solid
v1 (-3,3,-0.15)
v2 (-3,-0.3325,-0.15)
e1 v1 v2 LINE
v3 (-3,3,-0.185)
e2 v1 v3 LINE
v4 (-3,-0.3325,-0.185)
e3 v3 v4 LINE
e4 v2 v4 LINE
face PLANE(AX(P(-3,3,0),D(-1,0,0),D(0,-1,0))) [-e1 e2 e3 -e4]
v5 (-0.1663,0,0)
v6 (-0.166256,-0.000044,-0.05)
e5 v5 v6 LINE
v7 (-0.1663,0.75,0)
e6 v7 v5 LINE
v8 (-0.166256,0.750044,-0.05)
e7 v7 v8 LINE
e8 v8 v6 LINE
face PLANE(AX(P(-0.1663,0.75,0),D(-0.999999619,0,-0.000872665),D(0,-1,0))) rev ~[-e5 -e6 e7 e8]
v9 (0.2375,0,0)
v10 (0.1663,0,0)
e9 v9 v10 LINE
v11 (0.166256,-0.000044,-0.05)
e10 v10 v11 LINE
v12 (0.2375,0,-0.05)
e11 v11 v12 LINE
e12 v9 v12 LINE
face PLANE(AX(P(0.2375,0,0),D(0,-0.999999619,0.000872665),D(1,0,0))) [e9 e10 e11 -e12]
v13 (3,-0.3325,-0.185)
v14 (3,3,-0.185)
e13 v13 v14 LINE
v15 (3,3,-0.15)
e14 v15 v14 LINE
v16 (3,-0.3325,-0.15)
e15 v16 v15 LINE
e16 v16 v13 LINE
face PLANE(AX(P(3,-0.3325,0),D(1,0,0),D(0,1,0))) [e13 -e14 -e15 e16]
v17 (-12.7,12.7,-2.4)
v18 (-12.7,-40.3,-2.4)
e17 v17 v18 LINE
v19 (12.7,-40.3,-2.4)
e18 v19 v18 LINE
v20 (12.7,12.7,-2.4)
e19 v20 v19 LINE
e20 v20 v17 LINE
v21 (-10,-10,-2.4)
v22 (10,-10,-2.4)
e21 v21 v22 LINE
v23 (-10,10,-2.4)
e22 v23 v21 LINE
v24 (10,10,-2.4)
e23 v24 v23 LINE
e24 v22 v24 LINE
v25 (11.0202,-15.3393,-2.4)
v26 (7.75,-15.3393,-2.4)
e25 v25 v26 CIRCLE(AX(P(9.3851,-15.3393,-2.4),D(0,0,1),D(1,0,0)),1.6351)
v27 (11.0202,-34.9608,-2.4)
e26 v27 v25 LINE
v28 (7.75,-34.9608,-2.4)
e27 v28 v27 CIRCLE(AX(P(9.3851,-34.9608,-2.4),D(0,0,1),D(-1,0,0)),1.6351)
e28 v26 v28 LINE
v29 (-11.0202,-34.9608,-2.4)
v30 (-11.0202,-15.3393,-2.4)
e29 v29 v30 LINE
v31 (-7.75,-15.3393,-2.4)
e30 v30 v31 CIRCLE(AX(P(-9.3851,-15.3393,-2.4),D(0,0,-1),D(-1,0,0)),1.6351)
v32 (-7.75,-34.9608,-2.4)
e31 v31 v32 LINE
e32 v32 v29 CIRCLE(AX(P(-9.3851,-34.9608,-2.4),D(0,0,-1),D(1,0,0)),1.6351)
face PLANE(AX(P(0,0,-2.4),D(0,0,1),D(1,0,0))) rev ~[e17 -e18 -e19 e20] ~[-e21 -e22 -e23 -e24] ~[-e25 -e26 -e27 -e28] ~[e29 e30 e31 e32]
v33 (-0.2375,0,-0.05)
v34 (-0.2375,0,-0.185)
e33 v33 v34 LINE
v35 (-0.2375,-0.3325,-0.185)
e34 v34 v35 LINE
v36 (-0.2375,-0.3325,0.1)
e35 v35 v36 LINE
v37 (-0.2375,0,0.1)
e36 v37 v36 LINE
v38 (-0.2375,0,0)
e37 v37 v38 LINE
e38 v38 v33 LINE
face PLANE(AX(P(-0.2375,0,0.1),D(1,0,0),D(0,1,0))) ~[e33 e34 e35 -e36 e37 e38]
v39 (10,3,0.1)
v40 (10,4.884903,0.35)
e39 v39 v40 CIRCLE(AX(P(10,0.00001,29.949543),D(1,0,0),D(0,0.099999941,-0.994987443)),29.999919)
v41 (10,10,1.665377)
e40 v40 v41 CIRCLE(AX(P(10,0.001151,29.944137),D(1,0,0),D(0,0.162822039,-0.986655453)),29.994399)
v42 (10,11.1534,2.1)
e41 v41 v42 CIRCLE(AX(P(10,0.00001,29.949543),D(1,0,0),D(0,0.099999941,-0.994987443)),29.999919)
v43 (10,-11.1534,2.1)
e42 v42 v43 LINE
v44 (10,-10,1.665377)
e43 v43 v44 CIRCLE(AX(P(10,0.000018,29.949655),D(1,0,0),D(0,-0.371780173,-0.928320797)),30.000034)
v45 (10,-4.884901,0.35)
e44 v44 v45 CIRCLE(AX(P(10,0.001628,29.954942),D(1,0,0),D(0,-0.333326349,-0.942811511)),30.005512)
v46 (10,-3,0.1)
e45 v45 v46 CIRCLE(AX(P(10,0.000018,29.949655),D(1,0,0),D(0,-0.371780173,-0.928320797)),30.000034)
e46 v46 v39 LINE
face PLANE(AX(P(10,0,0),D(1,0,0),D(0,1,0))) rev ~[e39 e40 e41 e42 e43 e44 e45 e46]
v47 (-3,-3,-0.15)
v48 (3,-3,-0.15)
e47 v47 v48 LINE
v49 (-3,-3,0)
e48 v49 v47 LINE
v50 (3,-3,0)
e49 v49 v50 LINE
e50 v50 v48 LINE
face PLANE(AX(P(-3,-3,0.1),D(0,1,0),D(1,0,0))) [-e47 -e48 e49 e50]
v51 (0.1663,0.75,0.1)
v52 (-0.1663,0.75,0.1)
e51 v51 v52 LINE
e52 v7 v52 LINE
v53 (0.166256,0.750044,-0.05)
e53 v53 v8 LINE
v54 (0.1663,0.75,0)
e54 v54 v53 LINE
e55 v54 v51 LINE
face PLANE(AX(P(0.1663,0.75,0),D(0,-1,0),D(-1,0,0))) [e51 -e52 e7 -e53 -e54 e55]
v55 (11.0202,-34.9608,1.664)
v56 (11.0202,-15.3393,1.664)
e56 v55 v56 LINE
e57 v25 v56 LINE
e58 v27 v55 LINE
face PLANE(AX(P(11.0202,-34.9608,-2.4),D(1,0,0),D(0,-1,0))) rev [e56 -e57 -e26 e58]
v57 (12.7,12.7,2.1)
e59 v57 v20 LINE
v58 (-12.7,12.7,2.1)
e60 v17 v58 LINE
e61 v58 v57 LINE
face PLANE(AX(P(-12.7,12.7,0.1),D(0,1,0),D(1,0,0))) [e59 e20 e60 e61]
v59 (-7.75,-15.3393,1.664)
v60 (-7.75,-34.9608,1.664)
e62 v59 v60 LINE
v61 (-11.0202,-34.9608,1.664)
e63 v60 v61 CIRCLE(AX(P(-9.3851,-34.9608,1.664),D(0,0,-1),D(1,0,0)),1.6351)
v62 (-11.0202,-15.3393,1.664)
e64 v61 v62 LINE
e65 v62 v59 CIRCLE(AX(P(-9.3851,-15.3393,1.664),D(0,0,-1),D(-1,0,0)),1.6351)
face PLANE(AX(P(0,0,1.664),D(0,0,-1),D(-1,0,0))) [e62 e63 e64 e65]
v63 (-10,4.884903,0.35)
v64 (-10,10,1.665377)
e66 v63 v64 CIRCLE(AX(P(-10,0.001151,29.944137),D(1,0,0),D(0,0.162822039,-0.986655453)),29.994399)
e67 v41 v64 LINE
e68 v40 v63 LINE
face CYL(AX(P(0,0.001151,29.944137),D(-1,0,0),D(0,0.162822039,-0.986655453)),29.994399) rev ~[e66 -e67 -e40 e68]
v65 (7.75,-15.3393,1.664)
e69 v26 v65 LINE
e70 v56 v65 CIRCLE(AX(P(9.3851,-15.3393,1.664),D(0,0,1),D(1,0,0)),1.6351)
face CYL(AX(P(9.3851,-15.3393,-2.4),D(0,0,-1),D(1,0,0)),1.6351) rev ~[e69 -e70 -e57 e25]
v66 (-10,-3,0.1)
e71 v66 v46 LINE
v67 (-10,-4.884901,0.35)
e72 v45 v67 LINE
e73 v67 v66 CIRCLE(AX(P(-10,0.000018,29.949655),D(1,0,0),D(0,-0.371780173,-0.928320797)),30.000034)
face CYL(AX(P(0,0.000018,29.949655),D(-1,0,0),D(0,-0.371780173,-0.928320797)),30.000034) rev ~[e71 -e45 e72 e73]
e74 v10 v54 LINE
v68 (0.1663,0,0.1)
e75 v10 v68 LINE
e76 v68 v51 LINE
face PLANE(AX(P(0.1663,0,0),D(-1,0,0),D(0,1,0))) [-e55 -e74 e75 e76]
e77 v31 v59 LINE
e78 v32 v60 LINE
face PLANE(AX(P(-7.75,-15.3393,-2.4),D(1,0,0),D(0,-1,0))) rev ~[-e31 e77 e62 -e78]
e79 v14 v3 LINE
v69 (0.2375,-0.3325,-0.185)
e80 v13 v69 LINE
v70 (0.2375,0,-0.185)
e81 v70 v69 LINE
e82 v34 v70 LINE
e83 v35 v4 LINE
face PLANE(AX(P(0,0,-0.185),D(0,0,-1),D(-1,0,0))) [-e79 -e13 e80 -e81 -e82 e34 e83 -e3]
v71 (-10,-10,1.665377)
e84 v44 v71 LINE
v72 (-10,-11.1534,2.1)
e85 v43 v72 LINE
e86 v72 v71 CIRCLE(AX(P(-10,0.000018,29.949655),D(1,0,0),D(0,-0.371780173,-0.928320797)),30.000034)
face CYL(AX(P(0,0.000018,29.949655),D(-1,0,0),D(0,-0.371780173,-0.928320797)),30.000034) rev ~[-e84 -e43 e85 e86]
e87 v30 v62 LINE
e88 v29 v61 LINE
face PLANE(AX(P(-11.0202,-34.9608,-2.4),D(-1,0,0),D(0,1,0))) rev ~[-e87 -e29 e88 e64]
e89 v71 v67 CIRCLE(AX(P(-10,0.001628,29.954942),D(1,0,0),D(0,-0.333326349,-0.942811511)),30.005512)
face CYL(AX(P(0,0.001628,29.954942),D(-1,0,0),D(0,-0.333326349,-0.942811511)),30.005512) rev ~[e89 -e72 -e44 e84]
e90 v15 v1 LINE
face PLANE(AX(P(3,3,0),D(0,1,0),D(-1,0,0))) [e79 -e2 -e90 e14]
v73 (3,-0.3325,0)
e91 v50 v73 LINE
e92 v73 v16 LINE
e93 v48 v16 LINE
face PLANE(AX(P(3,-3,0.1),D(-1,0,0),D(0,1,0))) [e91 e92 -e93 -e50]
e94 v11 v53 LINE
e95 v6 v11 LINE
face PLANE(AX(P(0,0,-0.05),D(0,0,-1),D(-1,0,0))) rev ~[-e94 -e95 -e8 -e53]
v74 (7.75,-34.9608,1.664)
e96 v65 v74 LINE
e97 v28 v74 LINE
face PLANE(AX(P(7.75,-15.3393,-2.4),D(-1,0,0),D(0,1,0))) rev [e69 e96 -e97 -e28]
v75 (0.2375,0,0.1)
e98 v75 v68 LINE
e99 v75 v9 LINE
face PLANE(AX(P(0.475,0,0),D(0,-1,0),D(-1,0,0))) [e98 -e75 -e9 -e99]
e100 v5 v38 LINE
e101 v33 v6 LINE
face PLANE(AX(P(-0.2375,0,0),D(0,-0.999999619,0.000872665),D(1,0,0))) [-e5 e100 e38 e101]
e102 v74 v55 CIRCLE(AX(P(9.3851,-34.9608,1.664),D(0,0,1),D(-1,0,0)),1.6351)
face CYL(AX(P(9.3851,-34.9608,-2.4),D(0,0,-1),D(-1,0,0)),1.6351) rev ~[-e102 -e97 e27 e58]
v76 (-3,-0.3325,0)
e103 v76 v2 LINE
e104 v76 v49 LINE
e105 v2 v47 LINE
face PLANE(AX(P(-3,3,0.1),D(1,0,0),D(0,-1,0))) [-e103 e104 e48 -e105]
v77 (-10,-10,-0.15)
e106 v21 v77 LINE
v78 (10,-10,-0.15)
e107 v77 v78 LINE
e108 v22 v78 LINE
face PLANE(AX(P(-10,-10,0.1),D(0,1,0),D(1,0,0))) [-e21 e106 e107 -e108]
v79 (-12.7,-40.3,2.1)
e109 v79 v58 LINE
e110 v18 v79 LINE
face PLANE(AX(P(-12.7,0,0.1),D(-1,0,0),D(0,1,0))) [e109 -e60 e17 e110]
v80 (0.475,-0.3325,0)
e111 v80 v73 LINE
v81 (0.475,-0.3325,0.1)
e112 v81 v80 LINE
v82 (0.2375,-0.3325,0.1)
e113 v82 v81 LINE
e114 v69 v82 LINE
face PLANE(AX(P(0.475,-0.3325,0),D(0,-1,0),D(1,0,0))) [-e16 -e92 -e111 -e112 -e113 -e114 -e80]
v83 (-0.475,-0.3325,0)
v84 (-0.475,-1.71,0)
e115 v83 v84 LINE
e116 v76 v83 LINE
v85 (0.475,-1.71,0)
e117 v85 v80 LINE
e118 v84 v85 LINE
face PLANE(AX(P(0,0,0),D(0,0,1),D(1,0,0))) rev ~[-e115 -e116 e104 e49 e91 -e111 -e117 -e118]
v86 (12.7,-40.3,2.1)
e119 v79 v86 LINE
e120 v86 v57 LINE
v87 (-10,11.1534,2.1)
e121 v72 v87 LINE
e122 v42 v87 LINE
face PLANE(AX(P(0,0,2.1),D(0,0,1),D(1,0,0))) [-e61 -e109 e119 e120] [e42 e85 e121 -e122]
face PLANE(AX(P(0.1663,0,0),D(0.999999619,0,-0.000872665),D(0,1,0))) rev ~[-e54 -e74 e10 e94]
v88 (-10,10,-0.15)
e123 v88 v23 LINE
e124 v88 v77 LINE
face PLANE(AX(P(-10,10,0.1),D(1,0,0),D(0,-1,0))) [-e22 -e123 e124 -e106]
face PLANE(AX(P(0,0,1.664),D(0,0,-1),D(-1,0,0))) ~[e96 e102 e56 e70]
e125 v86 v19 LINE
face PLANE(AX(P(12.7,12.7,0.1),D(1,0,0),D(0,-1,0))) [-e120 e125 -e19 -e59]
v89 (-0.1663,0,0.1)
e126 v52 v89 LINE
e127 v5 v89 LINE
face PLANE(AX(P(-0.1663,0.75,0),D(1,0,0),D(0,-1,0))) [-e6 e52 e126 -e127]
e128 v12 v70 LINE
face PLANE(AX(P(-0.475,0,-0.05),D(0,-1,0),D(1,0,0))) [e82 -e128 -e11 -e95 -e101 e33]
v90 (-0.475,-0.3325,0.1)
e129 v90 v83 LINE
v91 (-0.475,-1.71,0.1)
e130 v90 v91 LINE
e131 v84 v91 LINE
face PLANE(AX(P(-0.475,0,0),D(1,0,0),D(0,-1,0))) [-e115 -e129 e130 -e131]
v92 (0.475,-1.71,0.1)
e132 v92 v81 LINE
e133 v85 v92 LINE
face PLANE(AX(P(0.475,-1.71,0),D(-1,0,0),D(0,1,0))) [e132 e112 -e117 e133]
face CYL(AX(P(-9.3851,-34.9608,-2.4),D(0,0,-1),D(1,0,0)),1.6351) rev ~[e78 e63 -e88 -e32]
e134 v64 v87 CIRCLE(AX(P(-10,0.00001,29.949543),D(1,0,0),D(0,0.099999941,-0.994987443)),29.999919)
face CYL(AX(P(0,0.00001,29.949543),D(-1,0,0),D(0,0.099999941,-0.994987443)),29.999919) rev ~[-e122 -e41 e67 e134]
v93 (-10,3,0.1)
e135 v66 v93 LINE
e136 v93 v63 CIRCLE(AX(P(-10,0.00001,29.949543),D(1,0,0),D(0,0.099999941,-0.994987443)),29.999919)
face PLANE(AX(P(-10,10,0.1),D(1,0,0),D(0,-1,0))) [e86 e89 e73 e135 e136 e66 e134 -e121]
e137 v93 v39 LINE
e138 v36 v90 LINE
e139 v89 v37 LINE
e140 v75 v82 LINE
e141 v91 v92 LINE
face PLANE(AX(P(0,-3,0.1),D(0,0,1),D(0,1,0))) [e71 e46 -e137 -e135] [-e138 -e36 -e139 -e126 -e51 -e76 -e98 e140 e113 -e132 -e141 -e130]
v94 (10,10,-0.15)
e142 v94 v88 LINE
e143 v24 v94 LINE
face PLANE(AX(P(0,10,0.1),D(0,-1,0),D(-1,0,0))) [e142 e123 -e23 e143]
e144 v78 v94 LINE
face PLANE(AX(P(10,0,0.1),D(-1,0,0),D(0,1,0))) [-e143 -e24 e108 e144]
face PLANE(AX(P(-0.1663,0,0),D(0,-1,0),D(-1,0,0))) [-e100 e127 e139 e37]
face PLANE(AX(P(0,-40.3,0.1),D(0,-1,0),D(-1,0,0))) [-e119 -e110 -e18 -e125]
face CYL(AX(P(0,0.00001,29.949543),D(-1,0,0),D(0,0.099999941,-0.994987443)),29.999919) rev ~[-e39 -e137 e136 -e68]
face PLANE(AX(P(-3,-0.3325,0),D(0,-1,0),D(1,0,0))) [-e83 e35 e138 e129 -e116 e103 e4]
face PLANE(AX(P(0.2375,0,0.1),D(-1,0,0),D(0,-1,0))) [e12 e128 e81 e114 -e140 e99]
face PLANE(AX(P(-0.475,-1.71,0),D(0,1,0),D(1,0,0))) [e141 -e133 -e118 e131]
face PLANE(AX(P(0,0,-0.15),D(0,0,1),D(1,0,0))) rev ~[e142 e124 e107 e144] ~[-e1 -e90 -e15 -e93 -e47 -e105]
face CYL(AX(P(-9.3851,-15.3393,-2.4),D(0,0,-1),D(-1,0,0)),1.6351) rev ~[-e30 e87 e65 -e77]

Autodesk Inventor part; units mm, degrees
ref_plane "XZ Plane" through (0, 0, 0) normal (0, 1, 0) x (-1, 0, 0)
ref_plane "XY Plane" through (0, 0, 0) normal (0, 0, 1) x (1, 0, 0)
sketch "Sketch1" plane through (0, 0, 0) normal (0, 0, 1) x (1, 0, 0)
  line L0 (-3, -3) -> (3, -3)
  line L1 (3, -3) -> (3, 3)
  line L2 (3, 3) -> (-3, 3)
  line L3 (-3, 3) -> (-3, -3)
  line L4 (-3, -3) -> (3, 3) construction
  line L5 (3, -3) -> (-3, 3) construction
  point P0 (0, 0)
  dimension "platform_w" = 6
  dimension "platform_h" = 6
extrude "Thin_Platform" add sketch "Sketch1" along normal blind 0.1
sketch "Sketch2" plane through (0, 0, 0) normal (0, 0, -1) x (-1, 0, 0)
  line L0 (-0.475, 0) -> (0.475, 0)
  line L1 (0.475, 0) -> (0.475, -1.71)
  line L2 (0.475, -1.71) -> (-0.475, -1.71)
  line L3 (-0.475, -1.71) -> (-0.475, 0)
  line L4 (-0.1663, 0.75) -> (0.1663, 0.75)
  line L5 (0.1663, 0.75) -> (0.1663, 0)
  line L6 (0.1663, 0) -> (-0.1663, 0)
  line L7 (-0.1663, 0) -> (-0.1663, 0.75)
  line L8 (0, -14) -> (0, 14) construction
  line L9 (-4.2, 0) -> (4.2, 0) construction
  point P0 (0, 0)
  point P1 (0, 0)
  point P2 (0, 0)
  dimension "hole_w" = 0.95
  dimension "hole_l" = 1.71
  dimension "organ_channel_l" = 0.75
  dimension "organ_channel_w" = 0.3325
extrude "Hole" cut sketch "Sketch2" against normal blind 0.1
sketch "Sketch6" plane through (0, 0, 0.1) normal (0, 0, 1) x (1, 0, 0)
  line L0 (0.1663, 0) -> (0.475, 0) projected
  line L1 (0.475, 0) -> (0.2375, 0)
  line L2 (0.2375, 0) -> (0.2375, -0.3325)
  line L3 (0.2375, -0.3325) -> (0.475, -0.3325)
  line L4 (0.475, -0.3325) -> (0.475, 0)
  point P0 (0, 0)
  dimension "d18" = 0.2375
  dimension "d19" = 0.3325
extrude "Headrest" add sketch "Sketch6" against normal blind 0.15
mirror "Headrest_mirror" about plane through (0, 0, 0) normal (1, 0, 0) of "Headrest"
sketch "Sketch8" plane through (0, 0, 0) normal (0, 0, -1) x (-1, 0, 0)
  line L0 (0.2375, 0) -> (0.475, 0) projected
  line L1 (0.1663, 0.75) -> (0.1663, 0) projected
  line L2 (0.475, 0) -> (0.1663, 0)
  line L3 (0.1663, 0) -> (0.1663, 0.75)
  line L4 (0.1663, 0.75) -> (0.475, 0.75)
  line L5 (0.475, 0.75) -> (0.475, 0)
  line L6 (-0.2375, 0) -> (-0.475, 0) projected
  line L7 (-0.1663, 0) -> (-0.1663, 0.75) projected
  line L8 (-0.475, 0) -> (-0.1662, 0)
  line L9 (-0.1662, 0) -> (-0.1663, 0.75)
  line L10 (-0.1663, 0.75) -> (-0.475, 0.75)
  line L11 (-0.475, 0.75) -> (-0.475, 0)
  point P0 (0, 0)
extrude "Tape_1" add sketch "Sketch8" along normal blind 0.05 draft 0.05
sketch "Sketch9" plane through (0, 0, -0.05) normal (0, 0, -1) x (-1, 0, 0)
  line L0 (-0.475, 0) -> (-0.475, 0.75) projected
  line L1 (0.475, 0) -> (0.475, -0.3325) projected
  line L2 (-0.475, 0.75) -> (0.475, 0.75)
  line L3 (0.475, 0.75) -> (0.475, 0)
  line L4 (0.475, 0) -> (-0.475, 0)
  line L5 (-0.475, 0) -> (-0.475, 0.75)
  point P0 (0, 0)
extrude "Wax_Platform" add sketch "Sketch9" along normal blind 0.135
sketch "Sketch27" plane through (0, 0, 0) normal (0, 0, -1) x (-1, 0, 0)
  line L0 (3, 3) -> (-3, 3)
  line L1 (3, -0.3325) -> (3, 3)
  line L2 (-3, 3) -> (-3, -0.3325)
  line L3 (-3, 3) -> (3, 3)
  line L4 (0.475, -0.3325) -> (3, -0.3325)
  line L5 (-3, 3) -> (3, 3) projected
  line L6 (-0.475, -0.3325) -> (-3, -0.3325)
  line L7 (-3, -3) -> (-3, 3) projected
  line L8 (3, 3) -> (3, -3) projected
  line L9 (0.475, 0.75) -> (0.475, 0) projected
  line L10 (0.475, -0.3325) -> (0.475, 0.75)
  line L11 (0.475, 0.75) -> (-0.475, 0.75)
  line L12 (-0.475, 0.75) -> (-0.475, -0.3325)
  point P0 (-0.475, 0.75)
extrude "Pillow_Extension" [suppressed]
sketch "Sketch10" plane through (0, 0, 0.1) normal (0, 0, 1) x (1, 0, 0)
  line L0 (3, 3) -> (-3, 3) projected
  line L1 (3, -3) -> (3, 3) projected
  line L2 (-3, 3) -> (-3, -3) projected
  line L3 (-3, -3) -> (3, -3) projected
  line L4 (-10, -10) -> (10, -10)
  line L5 (10, -10) -> (10, 10)
  line L6 (10, 10) -> (-10, 10)
  line L7 (-10, 10) -> (-10, -10)
  line L8 (-10, -10) -> (10, 10) construction
  line L9 (10, -10) -> (-10, 10) construction
  point P0 (0, 0)
  dimension "d27" = 20
  dimension "d28" = 20
extrude "Field" add sketch "Sketch10" along normal mid plane 0.5
sketch "Plate_geometry" plane through (0, 0, 0.1) normal (0, 0, 1) x (1, 0, 0)
  line L0 (-12.7, 12.7) -> (12.7, 12.7)
  line L1 (12.7, 12.7) -> (12.7, -40.3)
  line L2 (12.7, -40.3) -> (-12.7, -40.3)
  line L3 (-12.7, -40.3) -> (-12.7, 12.7)
  line L4 (-12.7, 12.7) -> (12.7, -40.3) construction
  line L5 (12.7, 12.7) -> (-12.7, -40.3) construction
  line L6 (0, 23.3) -> (0, -50.9) projected
  line L7 (-114.4038, 0) -> (50.3472, 0) projected
  line L8 (-90.868, 12.7) -> (26.8113, 12.7) construction
  line L9 (-10, -10) -> (10, -10) projected
  line L10 (-10, 10) -> (-10, -10) projected
  line L11 (10, 10) -> (-10, 10) projected
  line L12 (10, -10) -> (10, 10) projected
  point P0 (0, 0)
  point P1 (0, -13.8)
  point P2 (0, -13.8)
  dimension "d31" = 25.4
  dimension "d32" = 53
  dimension "d33" = 12.7
extrude "Plate_Extr" add sketch "Plate_geometry" along normal blind 2 and the other way blind 2.5 contours L0 L6 L11 L10 L7 L3 | L0 L1 L7 L12 L11 L6 | L7 L10 L9 L6 L2 L3 | L1 L2 L6 L9 L12 L7
sketch "Organ_Channel" plane through (0, 0, 0.1) normal (0, 0, 1) x (1, 0, 0)
  line L0 (-3, -3) -> (3, -3) projected
  line L1 (3, -3) -> (3, 3) projected
  line L2 (3, 3) -> (-3, 3) projected
  line L3 (-3, 3) -> (-3, -3) projected
  line L4 (0.1662, 0.75) -> (-0.1662, 0.75) projected
  line L5 (0.1663, -0.75) -> (-0.1662, -0.75)
  line L6 (-0.1662, -0.75) -> (-0.1662, 0.75)
  line L7 (-0.1662, 0.75) -> (0.1663, 0.75)
  line L8 (0.1663, 0.75) -> (0.1663, -0.75)
  line L9 (0.1663, -0.75) -> (-0.1662, 0.75) construction
  line L10 (-0.1662, -0.75) -> (0.1663, 0.75) construction
  point P0 (0, 0)
  dimension "d43" = 0.3325
  dimension "d44" = 1.5
sketch "Headrest_Hole" plane through (0, 0, 0.1) normal (0, 0, 1) x (1, 0, 0)
  line L0 (-0.1662, 0) -> (0.1662, 0) projected
  line L1 (-0.2375, 0) -> (-0.1663, 0) projected
  line L2 (-0.2375, 0) -> (-0.2375, -0.3325) projected
  line L3 (-0.2375, -0.3325) -> (-0.475, -0.3325) projected
  line L4 (-0.475, -1.71) -> (-0.475, -0.3325) projected
  line L5 (0.475, -1.71) -> (-0.475, -1.71) projected
  line L6 (0.475, -0.3325) -> (0.475, -1.71) projected
  line L7 (0.2375, -0.3325) -> (0.475, -0.3325) projected
  line L8 (0.2375, 0) -> (0.2375, -0.3325) projected
  line L9 (0.1663, 0) -> (0.2375, 0) projected
  point P0 (0, 0)
sketch "Tape_0" plane through (0, 0, 0) normal (0, 0, -1) x (-1, 0, 0)
  line L0 (3, -3) -> (-3, -3) projected
  line L1 (3, 3) -> (3, -3) projected
  line L2 (-3, -3) -> (-3, 3) projected
  line L3 (0.475, -0.3325) -> (0.475, -1.71) projected
  line L4 (0.475, -1.71) -> (-0.475, -1.71) projected
  line L5 (-0.475, -1.71) -> (-0.475, -0.3325) projected
  line L6 (-0.475, -0.3325) -> (-0.475, 0) projected
  line L7 (-0.475, -0.3325) -> (0.475, -0.3325)
  line L8 (0.475, -0.3325) -> (0.475, 0.75)
  line L9 (0.475, 0.75) -> (-0.475, 0.75)
  line L10 (-0.475, 0.75) -> (-0.475, -0.3325)
  line L11 (-0.475, -0.3325) -> (0.475, 0.75) construction
  line L12 (0.475, -0.3325) -> (-0.475, 0.75) construction
  line L13 (-1.4815, 1.2193) -> (-1.4815, 2.3021)
  line L14 (-1.4815, 2.3021) -> (-2.3274, 2.3021)
  line L15 (-2.3274, 2.3021) -> (-2.3274, 1.2193)
  line L16 (-2.3274, 1.2193) -> (-1.4815, 1.2193)
  line L17 (-1.4815, 1.2193) -> (-2.3274, 2.3021) construction
  line L18 (-1.4815, 2.3021) -> (-2.3274, 1.2193) construction
  line L19 (0, 0.2087) -> (0, 0.75) construction
  line L20 (0.475, 0.75) -> (-0.475, 0.75) construction
  line L21 (0, -14) -> (0, 14) construction
  line L22 (0.1663, 0.75) -> (-0.1663, 0.75) construction
  line L23 (-0.475, -0.3325) -> (-0.2375, -0.3325) construction
  line L24 (-0.475, 0.75) -> (-0.475, 0) construction
  line L25 (0.1663, 0.75) -> (0.475, 0.75) projected
  line L26 (-0.475, 0) -> (-0.475, 0.75) projected
  line L27 (-0.475, 0.75) -> (-0.1663, 0.75) projected
  line L28 (-0.1663, 0.75) -> (0.1663, 0.75) projected
  line L29 (-3, 3) -> (3, 3) projected
  line L30 (0.475, 0.75) -> (0.475, 0) projected
  line L31 (0.475, 0) -> (0.475, -0.3325) projected
  point P0 (-1.9045, 1.7607)
sketch "Organ_Tape_Face" plane through (0, 0, -0.185) normal (0, 0, -1) x (-1, 0, 0)
  line L0 (0.475, 0.75) -> (-0.475, 0.75) projected
  line L1 (-0.475, 0.75) -> (-0.475, 0) projected
  line L2 (-0.475, 0) -> (0.475, 0) projected
  line L3 (-0.975, 1.25) -> (1, 1.25)
  line L4 (1, 1.25) -> (1, -0.5)
  line L5 (1, -0.5) -> (-0.975, -0.5)
  line L6 (-0.975, -0.5) -> (-0.975, 1.25)
  line L7 (0.475, 0) -> (0.475, 0.75) projected
  point P0 (0, 0)
  dimension "d45" = 0.5
sketch "Headrest_Pillows" plane through (0, 0, -0.05) normal (0, 0, -1) x (-1, 0, 0)
  line L0 (0.975, -0.3325) -> (0.975, -1.71)
  line L1 (0.975, -1.71) -> (-1.025, -1.71)
  line L2 (-1.025, -1.71) -> (-1.025, -0.3325)
  line L3 (0.475, -1.71) -> (-0.475, -1.71) projected
  line L4 (-0.475, 0) -> (-0.475, -0.3325) projected
  line L5 (-0.475, -0.3325) -> (-0.2375, -0.3325) projected
  line L6 (-0.2375, -0.3325) -> (-0.2375, 0) projected
  line L7 (0.2375, -0.3325) -> (0.2375, 0) projected
  line L8 (0.475, -0.3325) -> (0.2375, -0.3325) projected
  line L9 (0.475, 0) -> (0.475, -0.3325) projected
  line L10 (-1.025, -0.3325) -> (-0.475, -0.3325)
  line L11 (-0.2375, 0) -> (0.2375, 0)
  line L12 (0.475, -0.3325) -> (0.975, -0.3325)
  line L13 (-0.2375, -0.3325) -> (-0.475, -0.3325) projected
sketch "Sketch20" plane through (0, 0, 0) normal (1, 0, 0) x (0, 1, 0)
  line L0 (10, 0.35) -> (10, 2.1)
  line L1 (-10, 0.35) -> (-10, 2.1)
  line L2 (-3, 0) -> (3, 0)
  line L3 (-10, 2.1) -> (10, 2.1)
  ellipse E0 centre (0, 2.1) end of major axis (-10, 2.1) minor radius 2
  line L4 (-10, 0.35) -> (10, 0.35)
  point P0 (0, 0)
  point P1 (0, 0)
  point P2 (0, 0.1)
sketch "Sketch21" plane through (0, 0, 0) normal (1, 0, 0) x (0, 1, 0)
  line L0 (0, -6.2139) -> (0, 35.9769) construction
  line L1 (0, 35.9769) -> (0, -6.2139) construction
  line L2 (10, 0.35) -> (10, 2.1) construction
  line L3 (-10, 0.35) -> (10, 0.35) construction
  line L4 (3, 0.35) -> (3, 0.1) projected
  line L5 (-3, 0.1) -> (3, 0.1) projected
  line L6 (-40.3, 2.1) -> (12.7, 2.1) projected
  arc A0 (3, 0.1) -> (11.1534, 2.1) centre (0, 29.9496) ccw
  arc A1 (-11.1534, 2.1) -> (-3, 0.1) centre (0, 29.9496) ccw
  point P0 (0, 0)
sketch "Sketch22" plane through (0, 0, 0) normal (1, 0, 0) x (0, 1, 0)
  line L0 (0, -22.9178) -> (0, 61.0822) construction
  line L1 (0, 61.0822) -> (0, -22.9178) construction
  line L2 (10, 0.35) -> (10, 2.1) construction
  line L3 (-10, 0.35) -> (10, 0.35) construction
  line L4 (3, 0.35) -> (3, 0.1)
  line L5 (-3, 0.1) -> (3, 0.1)
  line L6 (-40.3, 2.1) -> (12.7, 2.1)
  arc A0 (4.8849, 0.35) -> (10, 1.6654) centre (0, 29.9496) ccw
  arc A1 (-10, 1.6654) -> (-4.8849, 0.35) centre (0, 29.9496) ccw
  line L7 (-10, 0.35) -> (10, 0.35) projected
  line L8 (10, 1.6654) -> (10, 0.35)
  line L9 (10, 0.35) -> (4.8849, 0.35)
  line L10 (-10, 0.35) -> (-10, 2.1) projected
  line L11 (-10, 1.6654) -> (-10, 0.35)
  line L12 (-10, 0.35) -> (-4.8849, 0.35)
  point P0 (0, 0)
  point P1 (0, 0)
extrude "Extrusion10" cut sketch "Sketch21" along normal mid plane 20
extrude "Extrusion11" add sketch "Sketch22" along normal mid plane 20
sketch "Sketch24" plane through (0, 0, -2.4) normal (0, 0, -1) x (-1, 0, 0)
  line L0 (-3, -3) -> (-3, 3) projected
  line L1 (3, 3) -> (3, -3) projected
  line L2 (3, -3) -> (-3, -3) projected
  line L3 (-10, -10) -> (10, -10) projected
  line L4 (10, -10) -> (10, 10) projected
  line L5 (10, 10) -> (-10, 10) projected
  line L6 (-10, 10) -> (-10, -10) projected
  line L7 (12.7, 12.7) -> (12.7, -12.7)
  line L8 (12.7, -12.7) -> (-12.7, -12.7)
  line L9 (-12.7, -12.7) -> (-12.7, 12.7)
  line L10 (-12.7, 12.7) -> (12.7, 12.7)
  line L11 (-3, 3) -> (3, 3) projected
  point P0 (0, 0)
extrude "Extrusion12" [suppressed]
sketch "Sketch26" plane through (0, 0, -0.05) normal (0, 0, -1) x (-1, 0, 0)
  line L0 (-0.1662, 0.75) -> (-0.1662, 0.75) projected
  line L1 (-0.475, 0) -> (-0.475, 0.75) projected
  line L2 (-0.475, 0) -> (-0.475, 0) projected
  line L3 (-0.475, 0) -> (-0.475, -0.3325) projected
  line L4 (-0.475, -0.3325) -> (-0.2375, -0.3325) projected
  line L5 (-0.2375, -0.3325) -> (-0.2375, 0) projected
  line L6 (-0.1662, 0) -> (-0.2375, 0) projected
  line L7 (0.1662, 0) -> (0.1662, 0) projected
  line L8 (0.2375, 0) -> (0.1662, 0) projected
  line L9 (0.2375, -0.3325) -> (0.2375, 0) projected
  line L10 (0.475, -0.3325) -> (0.2375, -0.3325) projected
  line L11 (-0.475, 0) -> (-0.475, -0.3325) projected
  line L12 (-0.2375, -0.3325) -> (-0.475, -0.3325)
  line L13 (-0.475, -0.3325) -> (-0.475, 0)
  line L14 (-0.475, 0) -> (-0.2375, 0)
  line L15 (-0.2375, 0) -> (-0.2375, -0.3325)
  line L16 (0.475, -0.3325) -> (0.2375, -0.3325) projected
  line L17 (0.2375, -0.3325) -> (0.2375, 0) projected
  line L18 (0.475, -0.3325) -> (0.2375, -0.3325)
  line L19 (0.2375, -0.3325) -> (0.2375, 0)
  line L20 (0.2375, 0) -> (0.475, 0)
  line L21 (0.475, 0) -> (0.475, -0.3325)
  line L22 (0.475, 0) -> (0.1662, 0) projected
  line L23 (0.475, 0) -> (0.1662, 0) projected
  line L24 (0.1662, 0.75) -> (0.475, 0.75) projected
  line L25 (0.1662, 0.75) -> (0.1662, 0.75) projected
  line L26 (0.1662, 0.75) -> (0.475, 0.75) projected
  line L27 (-0.475, 0.75) -> (-0.1662, 0.75) projected
  line L28 (-0.1662, 0.75) -> (-0.1662, 0.75) projected
  line L29 (-0.475, 0.75) -> (-0.1662, 0.75) projected
  line L30 (-0.475, 0) -> (-0.475, 0.75) projected
  line L31 (-0.475, 0) -> (-0.475, 0) projected
  line L32 (-0.475, 0) -> (-0.475, -0.3325) projected
  line L33 (-0.475, -0.3325) -> (-0.2375, -0.3325) projected
  line L34 (-0.2375, -0.3325) -> (-0.2375, 0) projected
  line L35 (-0.1662, 0) -> (-0.2375, 0) projected
  line L36 (-0.1662, 0) -> (-0.1662, 0) projected
  line L37 (-0.475, 0) -> (-0.475, 0.75) projected
  line L38 (-0.475, 0.75) -> (-0.1662, 0.75) projected
  line L39 (-0.475, 0.75) -> (-0.1662, 0.75) projected
  line L40 (-0.1662, 0) -> (-0.1662, 0) projected
  line L41 (-0.475, 0) -> (-0.475, 0.75) projected
  line L42 (0.1662, 0) -> (0.1662, 0) projected
  line L43 (0.2375, 0) -> (0.1662, 0) projected
  line L44 (0.2375, -0.3325) -> (0.2375, 0) projected
  line L45 (0.475, -0.3325) -> (0.2375, -0.3325) projected
  line L46 (0.1662, 0.75) -> (0.475, 0.75) projected
  line L47 (0.1662, 0.75) -> (0.1662, 0.75) projected
  line L48 (0.1662, 0.75) -> (0.475, 0.75) projected
  line L49 (-0.2375, -0.3325) -> (-0.475, -0.3325)
  line L50 (-0.475, -0.3325) -> (-0.475, 0)
  line L51 (-0.475, 0) -> (-0.2375, 0)
  line L52 (-0.2375, 0) -> (-0.2375, -0.3325)
  line L53 (0.2375, -0.3325) -> (0.475, -0.3325)
  line L54 (0.475, -0.3325) -> (0.475, 0)
  line L55 (0.475, 0) -> (0.2375, 0)
  line L56 (0.2375, 0) -> (0.2375, -0.3325)
  line L57 (-0.1662, 0) -> (-0.475, 0) projected
  line L58 (0.475, 0) -> (0.475, -0.3325) projected
  line L59 (0.475, 0) -> (0.475, 0) projected
  line L60 (0.475, 0.75) -> (0.475, 0) projected
  line L61 (0.475, 0.75) -> (0.475, 0) projected
  line L62 (-0.1662, 0) -> (-0.475, 0) projected
  line L63 (0.475, 0) -> (0.475, -0.3325) projected
  line L64 (0.475, 0) -> (0.475, 0) projected
  line L65 (0.475, 0.75) -> (0.475, 0) projected
  line L66 (0.475, 0.75) -> (0.475, 0) projected
  point P0 (0, 0)
extrude "Extrusion13" [suppressed]
sketch "Sketch28" plane through (-0.1662, 0, -0.05) normal (0, 0, -1) x (-1, 0, 0)
  line L0 (0.0713, 0) -> (0.0713, -0.3325) projected
  line L1 (0.3087, -0.3325) -> (0.3087, 0) projected
  line L2 (0.0713, -0.3325) -> (0.3087, -0.3325)
  line L3 (0.3087, -0.3325) -> (0.3087, 0)
  line L4 (0.3087, 0) -> (0.0713, 0)
  line L5 (0.0713, 0) -> (0.0713, -0.3325)
  line L6 (-0.6412, 0) -> (-0.6412, 0.75) projected
  line L7 (-0.4037, -0.3325) -> (-0.6412, -0.3325)
  line L8 (-0.6412, -0.3325) -> (-0.6412, 0)
  line L9 (-0.6412, 0) -> (-0.4037, 0)
  line L10 (-0.4037, 0) -> (-0.4037, -0.3325)
  line L11 (-0.4037, -0.3325) -> (-0.4037, 0) projected
  point P0 (-0.1662, 0)
extrude "Extrusion15" add sketch "Sketch28" along normal up to surface (0.135 mm away)
sketch "Sketch29" plane through (0, 0, 0) normal (0, 0, -1) x (-1, 0, 0)
  line L0 (-3, -3) -> (-3, 3) projected
  line L1 (3, 3) -> (3, -3) projected
  line L2 (-3, 3) -> (3, 3)
  line L3 (3, 3) -> (3, -0.3325)
  line L4 (-3, -0.3325) -> (-3, 3)
  line L5 (-0.2375, -0.3325) -> (-0.475, -0.3325) projected
  line L6 (-0.475, 0.75) -> (-0.475, -0.3325) projected
  line L7 (0.475, 0) -> (0.475, -0.3325) projected
  line L8 (-0.475, 0.75) -> (0.475, 0.75)
  line L9 (0.475, 0.75) -> (0.475, -0.3325)
  line L10 (-0.475, -0.3325) -> (-0.475, 0.75)
  line L11 (3, -0.3325) -> (0.475, -0.3325)
  line L12 (-0.475, -0.3325) -> (-3, -0.3325)
  point P0 (0, 0)
extrude "Extrusion16" add sketch "Sketch29" along normal up to surface (0.185 mm away)
ref_plane "Work Plane1" through (0, 0, -6.2956) normal (0, 0, -1) x (-1, 0, 0)
ref_plane "Work Plane2" through (-12.7, -13.8, 2.1) normal (0, 1, 0) x (1, 0, 0)
sketch "Sketch30" plane through (0, 0, -2.4) normal (0, 0, -1) x (-1, 0, 0)
  line L0 (7.75, -10) -> (7.75, -40.3) construction
  line L1 (-12.7, -40.3) -> (12.7, -40.3) construction
  line L2 (10, -10) -> (-10, -10) construction
  line L3 (0, -25.15) -> (36.8265, -25.15) construction
  line L4 (0, -10) -> (0, -40.3) construction
  line L5 (9.3851, -15.3393) -> (9.3851, -34.9608) construction
  line L6 (7.75, -15.3393) -> (7.75, -34.9608)
  line L7 (11.0202, -34.9608) -> (11.0202, -15.3393)
  arc A0 (11.0202, -15.3393) -> (7.75, -15.3393) centre (9.3851, -15.3393) ccw
  arc A1 (7.75, -34.9608) -> (11.0202, -34.9608) centre (9.3851, -34.9608) ccw
  point P0 (0, 0)
  point P1 (9.3851, -25.15)
  dimension "d70" = 7.75
  dimension "d73" = 3.2702
  dimension "d74" = 19.6215
extrude "Extrusion17" cut sketch "Sketch30" against normal blind 4.064
mirror "Mirror3" about plane through (0, 0, 0) normal (1, 0, 0) of "Extrusion17"
equation "\"organ_channel_w\" = 0.35 * hole_w"
equation "\"d18\" = 0.25 * hole_w"
equation "\"d19\" = 1.4 * d18"
equation "\"head_rest\" = 1.5 * platform_th"
equation "\"d23\" = head_rest - platform_th"
equation "\"d43\" = organ_channel_w"
equation "\"d44\" = 2 * organ_channel_l"
equation "\"platform_th\" = 0.1"
properties part number "Mosquito Holder v12 RU - Delrin"
